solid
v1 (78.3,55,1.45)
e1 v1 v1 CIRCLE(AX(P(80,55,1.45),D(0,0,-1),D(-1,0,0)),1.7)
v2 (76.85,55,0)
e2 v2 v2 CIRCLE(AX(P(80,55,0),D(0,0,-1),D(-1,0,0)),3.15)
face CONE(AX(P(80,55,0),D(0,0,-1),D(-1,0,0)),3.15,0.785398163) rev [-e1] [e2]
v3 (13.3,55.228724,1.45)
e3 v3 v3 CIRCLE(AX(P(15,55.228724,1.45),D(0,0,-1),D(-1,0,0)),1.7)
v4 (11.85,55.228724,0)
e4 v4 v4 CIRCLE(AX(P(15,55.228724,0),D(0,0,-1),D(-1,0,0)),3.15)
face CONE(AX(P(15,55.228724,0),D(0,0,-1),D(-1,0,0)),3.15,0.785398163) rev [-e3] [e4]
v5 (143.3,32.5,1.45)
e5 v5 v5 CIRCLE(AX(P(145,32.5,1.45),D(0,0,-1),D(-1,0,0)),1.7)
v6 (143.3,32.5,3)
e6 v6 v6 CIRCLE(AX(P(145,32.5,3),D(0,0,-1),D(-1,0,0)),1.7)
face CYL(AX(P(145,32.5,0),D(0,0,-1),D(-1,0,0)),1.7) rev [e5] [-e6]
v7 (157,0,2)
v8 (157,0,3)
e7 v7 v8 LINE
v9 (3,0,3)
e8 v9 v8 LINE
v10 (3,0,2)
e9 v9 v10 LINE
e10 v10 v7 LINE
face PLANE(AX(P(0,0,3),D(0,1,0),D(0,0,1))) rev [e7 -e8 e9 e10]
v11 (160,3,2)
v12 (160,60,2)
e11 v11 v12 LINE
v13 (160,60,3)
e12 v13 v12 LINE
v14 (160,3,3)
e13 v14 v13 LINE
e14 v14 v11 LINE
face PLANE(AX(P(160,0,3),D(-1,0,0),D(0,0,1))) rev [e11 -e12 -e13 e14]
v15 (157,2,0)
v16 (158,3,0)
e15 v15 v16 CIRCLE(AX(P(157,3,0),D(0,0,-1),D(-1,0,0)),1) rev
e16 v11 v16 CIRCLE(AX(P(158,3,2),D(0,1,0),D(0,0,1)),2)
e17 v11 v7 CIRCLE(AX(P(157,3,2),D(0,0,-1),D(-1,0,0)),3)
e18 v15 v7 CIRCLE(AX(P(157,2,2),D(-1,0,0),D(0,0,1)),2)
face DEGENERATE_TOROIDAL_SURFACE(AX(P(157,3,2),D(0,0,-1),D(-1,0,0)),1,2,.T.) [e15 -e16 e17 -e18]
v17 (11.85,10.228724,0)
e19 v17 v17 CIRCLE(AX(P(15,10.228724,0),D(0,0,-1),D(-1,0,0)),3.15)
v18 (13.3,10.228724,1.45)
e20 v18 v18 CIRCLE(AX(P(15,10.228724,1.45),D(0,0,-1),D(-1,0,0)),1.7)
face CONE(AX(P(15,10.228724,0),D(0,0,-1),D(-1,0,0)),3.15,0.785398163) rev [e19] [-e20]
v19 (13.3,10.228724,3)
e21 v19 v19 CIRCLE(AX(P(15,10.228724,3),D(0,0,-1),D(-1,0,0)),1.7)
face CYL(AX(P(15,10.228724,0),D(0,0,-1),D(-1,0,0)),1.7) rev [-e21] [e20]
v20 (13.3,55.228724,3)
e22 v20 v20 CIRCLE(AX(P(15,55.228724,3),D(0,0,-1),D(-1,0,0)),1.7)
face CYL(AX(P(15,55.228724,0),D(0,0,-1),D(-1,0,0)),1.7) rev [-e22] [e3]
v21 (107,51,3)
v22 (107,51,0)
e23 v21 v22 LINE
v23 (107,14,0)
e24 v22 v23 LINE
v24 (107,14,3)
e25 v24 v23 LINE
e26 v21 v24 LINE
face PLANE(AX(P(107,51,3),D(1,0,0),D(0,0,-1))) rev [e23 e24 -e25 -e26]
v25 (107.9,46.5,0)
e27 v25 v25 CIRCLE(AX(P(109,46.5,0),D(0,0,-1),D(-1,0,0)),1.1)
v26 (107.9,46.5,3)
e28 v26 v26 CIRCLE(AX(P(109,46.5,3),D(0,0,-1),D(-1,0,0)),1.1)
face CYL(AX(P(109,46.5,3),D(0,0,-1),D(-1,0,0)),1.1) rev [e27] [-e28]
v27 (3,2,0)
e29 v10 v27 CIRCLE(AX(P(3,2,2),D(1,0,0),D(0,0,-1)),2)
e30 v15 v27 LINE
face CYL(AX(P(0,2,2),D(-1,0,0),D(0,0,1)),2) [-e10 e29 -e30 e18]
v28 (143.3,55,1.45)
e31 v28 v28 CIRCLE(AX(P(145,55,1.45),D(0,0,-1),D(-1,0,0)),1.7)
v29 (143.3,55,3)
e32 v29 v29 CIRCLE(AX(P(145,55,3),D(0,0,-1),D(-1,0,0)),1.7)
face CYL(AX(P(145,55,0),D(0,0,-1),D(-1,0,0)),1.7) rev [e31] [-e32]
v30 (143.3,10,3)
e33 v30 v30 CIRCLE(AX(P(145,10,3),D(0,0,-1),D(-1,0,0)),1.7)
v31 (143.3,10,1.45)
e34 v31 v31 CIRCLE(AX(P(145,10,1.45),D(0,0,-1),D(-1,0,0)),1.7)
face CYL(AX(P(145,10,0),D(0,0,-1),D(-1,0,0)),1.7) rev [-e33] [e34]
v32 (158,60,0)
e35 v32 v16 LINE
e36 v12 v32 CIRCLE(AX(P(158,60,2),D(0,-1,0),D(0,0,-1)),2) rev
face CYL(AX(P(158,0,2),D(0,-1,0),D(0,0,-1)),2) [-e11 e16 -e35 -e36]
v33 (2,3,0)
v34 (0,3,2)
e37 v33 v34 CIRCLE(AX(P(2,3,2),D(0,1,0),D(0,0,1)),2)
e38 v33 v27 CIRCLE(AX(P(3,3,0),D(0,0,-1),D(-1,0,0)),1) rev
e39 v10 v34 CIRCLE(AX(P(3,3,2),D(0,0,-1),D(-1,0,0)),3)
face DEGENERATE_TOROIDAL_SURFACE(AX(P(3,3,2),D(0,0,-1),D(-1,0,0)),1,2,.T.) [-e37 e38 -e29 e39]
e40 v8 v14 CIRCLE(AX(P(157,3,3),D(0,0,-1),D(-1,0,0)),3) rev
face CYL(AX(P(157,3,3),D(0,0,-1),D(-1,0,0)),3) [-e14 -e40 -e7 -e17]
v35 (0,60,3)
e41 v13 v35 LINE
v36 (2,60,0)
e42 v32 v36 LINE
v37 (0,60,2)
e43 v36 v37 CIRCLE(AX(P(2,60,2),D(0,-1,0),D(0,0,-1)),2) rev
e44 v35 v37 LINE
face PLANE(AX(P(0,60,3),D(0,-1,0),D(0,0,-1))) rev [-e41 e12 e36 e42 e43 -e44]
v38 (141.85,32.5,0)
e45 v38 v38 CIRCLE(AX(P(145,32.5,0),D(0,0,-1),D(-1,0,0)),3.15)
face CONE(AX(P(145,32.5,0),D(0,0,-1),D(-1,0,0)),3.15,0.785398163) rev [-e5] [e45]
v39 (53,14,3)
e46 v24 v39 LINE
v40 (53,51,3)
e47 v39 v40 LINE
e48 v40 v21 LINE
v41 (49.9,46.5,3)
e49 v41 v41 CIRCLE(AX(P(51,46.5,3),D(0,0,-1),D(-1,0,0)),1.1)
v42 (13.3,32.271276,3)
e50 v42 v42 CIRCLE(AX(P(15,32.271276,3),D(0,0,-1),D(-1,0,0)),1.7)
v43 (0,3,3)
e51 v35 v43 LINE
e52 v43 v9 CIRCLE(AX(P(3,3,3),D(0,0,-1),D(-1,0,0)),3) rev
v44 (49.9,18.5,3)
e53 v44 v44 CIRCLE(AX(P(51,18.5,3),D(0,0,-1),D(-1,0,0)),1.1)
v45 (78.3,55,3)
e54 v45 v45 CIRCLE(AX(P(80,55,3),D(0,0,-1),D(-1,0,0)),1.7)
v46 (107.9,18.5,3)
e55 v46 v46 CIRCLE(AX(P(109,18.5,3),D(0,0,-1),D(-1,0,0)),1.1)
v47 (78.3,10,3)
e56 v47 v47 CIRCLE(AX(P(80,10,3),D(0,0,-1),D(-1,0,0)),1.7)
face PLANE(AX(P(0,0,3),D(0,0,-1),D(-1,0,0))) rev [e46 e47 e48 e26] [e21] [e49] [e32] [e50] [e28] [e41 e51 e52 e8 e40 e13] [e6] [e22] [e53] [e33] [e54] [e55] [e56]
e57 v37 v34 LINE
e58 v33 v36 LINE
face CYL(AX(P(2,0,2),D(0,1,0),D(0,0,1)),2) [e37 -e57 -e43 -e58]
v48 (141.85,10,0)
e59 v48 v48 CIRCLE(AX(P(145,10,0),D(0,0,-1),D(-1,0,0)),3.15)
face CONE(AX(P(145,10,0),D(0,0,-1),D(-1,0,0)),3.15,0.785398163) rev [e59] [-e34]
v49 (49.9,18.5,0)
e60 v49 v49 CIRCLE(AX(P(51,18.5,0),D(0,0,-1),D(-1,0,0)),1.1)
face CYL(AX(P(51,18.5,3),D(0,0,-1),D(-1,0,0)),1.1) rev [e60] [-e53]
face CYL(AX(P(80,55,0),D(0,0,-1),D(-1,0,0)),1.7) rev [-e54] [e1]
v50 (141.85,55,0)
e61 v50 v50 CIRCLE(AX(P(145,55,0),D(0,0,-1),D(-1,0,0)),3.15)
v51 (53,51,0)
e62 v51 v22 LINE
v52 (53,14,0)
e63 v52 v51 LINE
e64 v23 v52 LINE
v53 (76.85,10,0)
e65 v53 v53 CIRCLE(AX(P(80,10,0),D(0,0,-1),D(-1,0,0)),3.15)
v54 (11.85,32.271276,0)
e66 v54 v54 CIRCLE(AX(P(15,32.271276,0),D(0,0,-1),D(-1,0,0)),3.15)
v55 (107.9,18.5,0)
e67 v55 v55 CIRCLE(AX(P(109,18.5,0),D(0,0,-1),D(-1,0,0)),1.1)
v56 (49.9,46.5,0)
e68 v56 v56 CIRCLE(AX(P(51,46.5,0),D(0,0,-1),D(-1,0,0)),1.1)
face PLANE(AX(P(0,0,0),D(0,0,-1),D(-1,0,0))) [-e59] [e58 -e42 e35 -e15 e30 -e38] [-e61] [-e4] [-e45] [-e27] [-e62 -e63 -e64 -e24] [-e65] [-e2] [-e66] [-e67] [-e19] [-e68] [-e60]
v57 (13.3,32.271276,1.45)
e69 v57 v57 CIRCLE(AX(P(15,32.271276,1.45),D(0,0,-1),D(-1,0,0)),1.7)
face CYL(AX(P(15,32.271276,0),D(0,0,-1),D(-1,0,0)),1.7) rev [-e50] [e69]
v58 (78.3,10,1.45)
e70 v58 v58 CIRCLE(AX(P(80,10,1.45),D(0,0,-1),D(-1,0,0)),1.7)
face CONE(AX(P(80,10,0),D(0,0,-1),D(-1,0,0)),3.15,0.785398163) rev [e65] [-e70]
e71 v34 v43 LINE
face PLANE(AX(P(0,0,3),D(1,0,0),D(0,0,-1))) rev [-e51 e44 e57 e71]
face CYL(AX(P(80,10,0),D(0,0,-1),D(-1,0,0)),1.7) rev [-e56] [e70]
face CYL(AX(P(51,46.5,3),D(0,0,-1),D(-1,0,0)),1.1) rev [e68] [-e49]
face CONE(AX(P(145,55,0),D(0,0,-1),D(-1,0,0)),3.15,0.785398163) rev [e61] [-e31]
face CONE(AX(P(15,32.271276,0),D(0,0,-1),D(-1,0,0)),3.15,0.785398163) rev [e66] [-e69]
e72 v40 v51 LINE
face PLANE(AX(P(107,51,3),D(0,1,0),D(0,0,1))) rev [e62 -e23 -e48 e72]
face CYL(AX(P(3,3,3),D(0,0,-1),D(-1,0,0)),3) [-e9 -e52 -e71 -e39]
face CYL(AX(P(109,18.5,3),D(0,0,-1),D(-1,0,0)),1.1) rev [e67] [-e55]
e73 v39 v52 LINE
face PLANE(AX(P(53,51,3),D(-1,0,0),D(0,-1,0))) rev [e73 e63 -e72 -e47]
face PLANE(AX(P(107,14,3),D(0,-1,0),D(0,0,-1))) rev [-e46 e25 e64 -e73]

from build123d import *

# Parameters (mm, degrees)
SKETCH1_W                                      = 160
SKETCH1_H                                      = 60
BOSS_EXTRUDE1_DEPTH                            = 3
SKETCH2_R                                      = 1.1
SKETCH2_W                                      = 54
SKETCH2_H                                      = 37
CUT_EXTRUDE1_DEPTH                             = 171.906407136
FILLET1_R                                      = 2
FILLET2_R                                      = 3
CSK_FOR_M3_FLAT_HEAD_MACHINE_SCREW1_AT_2_COUNT = 2
CSK_FOR_M3_FLAT_HEAD_MACHINE_SCREW1_AT_2_PITCH = 22.5
CSK_FOR_M3_FLAT_HEAD_MACHINE_SCREW1_AT_3_COUNT = 2
CSK_FOR_M3_FLAT_HEAD_MACHINE_SCREW1_AT_3_PITCH = 45
CSK_FOR_M3_FLAT_HEAD_MACHINE_SCREW1_AT_4_COUNT = 2
CSK_FOR_M3_FLAT_HEAD_MACHINE_SCREW1_AT_4_PITCH = 79.056941504
CSK_FOR_M3_FLAT_HEAD_MACHINE_SCREW1_AT_5_COUNT = 2
CSK_FOR_M3_FLAT_HEAD_MACHINE_SCREW1_AT_5_PITCH = 65
CSK_FOR_M3_FLAT_HEAD_MACHINE_SCREW1_AT_6_COUNT = 2
CSK_FOR_M3_FLAT_HEAD_MACHINE_SCREW1_AT_6_PITCH = 130.000201211
CSK_FOR_M3_FLAT_HEAD_MACHINE_SCREW1_AT_7_COUNT = 2
CSK_FOR_M3_FLAT_HEAD_MACHINE_SCREW1_AT_7_PITCH = 131.97194743
CSK_FOR_M3_FLAT_HEAD_MACHINE_SCREW1_AT_8_COUNT = 2
CSK_FOR_M3_FLAT_HEAD_MACHINE_SCREW1_AT_8_PITCH = 137.493516675


with BuildPart() as part:
    # Sketch1 → Boss-Extrude1 (new body)
    with BuildSketch(Plane.XY):
        with Locations((80, 30)):
            Rectangle(SKETCH1_W, SKETCH1_H)
    extrude(amount=BOSS_EXTRUDE1_DEPTH)

    # Sketch2 → Cut-Extrude1 (cut, through all)
    with BuildSketch(Plane(origin=(0, 0, 0), x_dir=(-1, 0, 0), z_dir=(0, 0, -1))):
        with Locations((-109, 46.5)):
            Circle(SKETCH2_R)
        with Locations((-109, 18.5)):
            Circle(SKETCH2_R)
        with Locations((-51, 18.5)):
            Circle(SKETCH2_R)
        with Locations((-51, 46.5)):
            Circle(SKETCH2_R)
        with Locations((-80, 32.5)):
            Rectangle(SKETCH2_W, SKETCH2_H)
    extrude(amount=-CUT_EXTRUDE1_DEPTH, mode=Mode.SUBTRACT)

    # Fillet1
    fillet1_edges = [part.edges().sort_by_distance(p)[0] for p in [
        (160, 30, 0),
        (80, 0, 0),
        (0, 30, 0),
    ]]
    fillet(fillet1_edges, radius=FILLET1_R)

    # Fillet2
    # the kernel refuses this fillet: 3 mm, written as the material it takes off along each edge
    with BuildSketch(Plane(origin=(3, 3, 0), x_dir=(0, -1, 0), z_dir=(1, 0, 0))) as fillet2_piece_1:
        with BuildLine():
            CenterArc((1, -2), 2, 0, 90)
            Line((3, -2), (3, 0))
            Line((3, 0), (1, 0))
        make_face()
    revolve(axis=Axis((3, 3, 0), (0, 0, -1)), revolution_arc=90, mode=Mode.SUBTRACT)
    with BuildSketch(Plane(origin=(157, 3, 0), x_dir=(1, 0, 0), z_dir=(0, 1, 0))) as fillet2_piece_2:
        with BuildLine():
            CenterArc((1, -2), 2, 0, 90)
            Line((3, -2), (3, 0))
            Line((3, 0), (1, 0))
        make_face()
    revolve(axis=Axis((157, 3, 0), (0, 0, -1)), revolution_arc=90, mode=Mode.SUBTRACT)
    with BuildSketch(Plane(origin=(160, 0, 0), x_dir=(-1, 0, 0), z_dir=(0, 0, 1))) as fillet2_piece_3:
        with BuildLine():
            CenterArc((FILLET2_R, -FILLET2_R), FILLET2_R, 90, 90)
            Line((0, -FILLET2_R), (0, 0))
            Line((0, 0), (FILLET2_R, 0))
        make_face()
    extrude(amount=10.5, mode=Mode.SUBTRACT)
    with BuildSketch(Plane(origin=(0, 0, 0), x_dir=(1, 0, 0), z_dir=(0, 0, 1))) as fillet2_piece_4:
        with BuildLine():
            CenterArc((FILLET2_R, FILLET2_R), FILLET2_R, 180, 90)
            Line((0, FILLET2_R), (0, 0))
            Line((0, 0), (FILLET2_R, 0))
        make_face()
    extrude(amount=10.5, mode=Mode.SUBTRACT)

    # Sketch5 → CSK for M3 Flat Head Machine Screw1 (revolve, cut)
    with BuildSketch(Plane(origin=(145, 55, 0), x_dir=(0, 1, 0), z_dir=(1, 0, 0))):
        Polygon((0, 0), (0, 3), (1.7, 3), (1.7, 1.45), (3.15, 0), align=None)
    csk_for_m3_flat_head_machine_screw1 = revolve(axis=Axis((145, 55, -6.35), (0, 0, 1)), mode=Mode.SUBTRACT)

    # CSK for M3 Flat Head Machine Screw1 at 2: CSK for M3 Flat Head Machine Screw1 ×2
    with Locations(*[(0, -i * CSK_FOR_M3_FLAT_HEAD_MACHINE_SCREW1_AT_2_PITCH, 0) for i in range(1, CSK_FOR_M3_FLAT_HEAD_MACHINE_SCREW1_AT_2_COUNT)]):
        add(csk_for_m3_flat_head_machine_screw1, mode=Mode.SUBTRACT)

    # CSK for M3 Flat Head Machine Screw1 at 3: CSK for M3 Flat Head Machine Screw1 ×2
    with Locations(*[(0, -i * CSK_FOR_M3_FLAT_HEAD_MACHINE_SCREW1_AT_3_PITCH, 0) for i in range(1, CSK_FOR_M3_FLAT_HEAD_MACHINE_SCREW1_AT_3_COUNT)]):
        add(csk_for_m3_flat_head_machine_screw1, mode=Mode.SUBTRACT)

    # CSK for M3 Flat Head Machine Screw1 at 4: CSK for M3 Flat Head Machine Screw1 ×2
    with Locations(*[Vector(-0.8221921916437787, -0.5692099788303083, 0) * (i * CSK_FOR_M3_FLAT_HEAD_MACHINE_SCREW1_AT_4_PITCH) for i in range(1, CSK_FOR_M3_FLAT_HEAD_MACHINE_SCREW1_AT_4_COUNT)]):
        add(csk_for_m3_flat_head_machine_screw1, mode=Mode.SUBTRACT)

    # CSK for M3 Flat Head Machine Screw1 at 5: CSK for M3 Flat Head Machine Screw1 ×2
    with Locations(*[(-i * CSK_FOR_M3_FLAT_HEAD_MACHINE_SCREW1_AT_5_PITCH, 0, 0) for i in range(1, CSK_FOR_M3_FLAT_HEAD_MACHINE_SCREW1_AT_5_COUNT)]):
        add(csk_for_m3_flat_head_machine_screw1, mode=Mode.SUBTRACT)

    # CSK for M3 Flat Head Machine Screw1 at 6: CSK for M3 Flat Head Machine Screw1 ×2
    with Locations(*[Vector(-0.9999984522282437, 0.0017594149928170457, 0) * (i * CSK_FOR_M3_FLAT_HEAD_MACHINE_SCREW1_AT_6_PITCH) for i in range(1, CSK_FOR_M3_FLAT_HEAD_MACHINE_SCREW1_AT_6_COUNT)]):
        add(csk_for_m3_flat_head_machine_screw1, mode=Mode.SUBTRACT)

    # CSK for M3 Flat Head Machine Screw1 at 7: CSK for M3 Flat Head Machine Screw1 ×2
    with Locations(*[Vector(-0.9850578288164882, -0.17222390625968964, 0) * (i * CSK_FOR_M3_FLAT_HEAD_MACHINE_SCREW1_AT_7_PITCH) for i in range(1, CSK_FOR_M3_FLAT_HEAD_MACHINE_SCREW1_AT_7_COUNT)]):
        add(csk_for_m3_flat_head_machine_screw1, mode=Mode.SUBTRACT)

    # CSK for M3 Flat Head Machine Screw1 at 8: CSK for M3 Flat Head Machine Screw1 ×2
    with Locations(*[Vector(-0.9454991271168818, -0.3256246314719061, 0) * (i * CSK_FOR_M3_FLAT_HEAD_MACHINE_SCREW1_AT_8_PITCH) for i in range(1, CSK_FOR_M3_FLAT_HEAD_MACHINE_SCREW1_AT_8_COUNT)]):
        add(csk_for_m3_flat_head_machine_screw1, mode=Mode.SUBTRACT)


solid = part.part
